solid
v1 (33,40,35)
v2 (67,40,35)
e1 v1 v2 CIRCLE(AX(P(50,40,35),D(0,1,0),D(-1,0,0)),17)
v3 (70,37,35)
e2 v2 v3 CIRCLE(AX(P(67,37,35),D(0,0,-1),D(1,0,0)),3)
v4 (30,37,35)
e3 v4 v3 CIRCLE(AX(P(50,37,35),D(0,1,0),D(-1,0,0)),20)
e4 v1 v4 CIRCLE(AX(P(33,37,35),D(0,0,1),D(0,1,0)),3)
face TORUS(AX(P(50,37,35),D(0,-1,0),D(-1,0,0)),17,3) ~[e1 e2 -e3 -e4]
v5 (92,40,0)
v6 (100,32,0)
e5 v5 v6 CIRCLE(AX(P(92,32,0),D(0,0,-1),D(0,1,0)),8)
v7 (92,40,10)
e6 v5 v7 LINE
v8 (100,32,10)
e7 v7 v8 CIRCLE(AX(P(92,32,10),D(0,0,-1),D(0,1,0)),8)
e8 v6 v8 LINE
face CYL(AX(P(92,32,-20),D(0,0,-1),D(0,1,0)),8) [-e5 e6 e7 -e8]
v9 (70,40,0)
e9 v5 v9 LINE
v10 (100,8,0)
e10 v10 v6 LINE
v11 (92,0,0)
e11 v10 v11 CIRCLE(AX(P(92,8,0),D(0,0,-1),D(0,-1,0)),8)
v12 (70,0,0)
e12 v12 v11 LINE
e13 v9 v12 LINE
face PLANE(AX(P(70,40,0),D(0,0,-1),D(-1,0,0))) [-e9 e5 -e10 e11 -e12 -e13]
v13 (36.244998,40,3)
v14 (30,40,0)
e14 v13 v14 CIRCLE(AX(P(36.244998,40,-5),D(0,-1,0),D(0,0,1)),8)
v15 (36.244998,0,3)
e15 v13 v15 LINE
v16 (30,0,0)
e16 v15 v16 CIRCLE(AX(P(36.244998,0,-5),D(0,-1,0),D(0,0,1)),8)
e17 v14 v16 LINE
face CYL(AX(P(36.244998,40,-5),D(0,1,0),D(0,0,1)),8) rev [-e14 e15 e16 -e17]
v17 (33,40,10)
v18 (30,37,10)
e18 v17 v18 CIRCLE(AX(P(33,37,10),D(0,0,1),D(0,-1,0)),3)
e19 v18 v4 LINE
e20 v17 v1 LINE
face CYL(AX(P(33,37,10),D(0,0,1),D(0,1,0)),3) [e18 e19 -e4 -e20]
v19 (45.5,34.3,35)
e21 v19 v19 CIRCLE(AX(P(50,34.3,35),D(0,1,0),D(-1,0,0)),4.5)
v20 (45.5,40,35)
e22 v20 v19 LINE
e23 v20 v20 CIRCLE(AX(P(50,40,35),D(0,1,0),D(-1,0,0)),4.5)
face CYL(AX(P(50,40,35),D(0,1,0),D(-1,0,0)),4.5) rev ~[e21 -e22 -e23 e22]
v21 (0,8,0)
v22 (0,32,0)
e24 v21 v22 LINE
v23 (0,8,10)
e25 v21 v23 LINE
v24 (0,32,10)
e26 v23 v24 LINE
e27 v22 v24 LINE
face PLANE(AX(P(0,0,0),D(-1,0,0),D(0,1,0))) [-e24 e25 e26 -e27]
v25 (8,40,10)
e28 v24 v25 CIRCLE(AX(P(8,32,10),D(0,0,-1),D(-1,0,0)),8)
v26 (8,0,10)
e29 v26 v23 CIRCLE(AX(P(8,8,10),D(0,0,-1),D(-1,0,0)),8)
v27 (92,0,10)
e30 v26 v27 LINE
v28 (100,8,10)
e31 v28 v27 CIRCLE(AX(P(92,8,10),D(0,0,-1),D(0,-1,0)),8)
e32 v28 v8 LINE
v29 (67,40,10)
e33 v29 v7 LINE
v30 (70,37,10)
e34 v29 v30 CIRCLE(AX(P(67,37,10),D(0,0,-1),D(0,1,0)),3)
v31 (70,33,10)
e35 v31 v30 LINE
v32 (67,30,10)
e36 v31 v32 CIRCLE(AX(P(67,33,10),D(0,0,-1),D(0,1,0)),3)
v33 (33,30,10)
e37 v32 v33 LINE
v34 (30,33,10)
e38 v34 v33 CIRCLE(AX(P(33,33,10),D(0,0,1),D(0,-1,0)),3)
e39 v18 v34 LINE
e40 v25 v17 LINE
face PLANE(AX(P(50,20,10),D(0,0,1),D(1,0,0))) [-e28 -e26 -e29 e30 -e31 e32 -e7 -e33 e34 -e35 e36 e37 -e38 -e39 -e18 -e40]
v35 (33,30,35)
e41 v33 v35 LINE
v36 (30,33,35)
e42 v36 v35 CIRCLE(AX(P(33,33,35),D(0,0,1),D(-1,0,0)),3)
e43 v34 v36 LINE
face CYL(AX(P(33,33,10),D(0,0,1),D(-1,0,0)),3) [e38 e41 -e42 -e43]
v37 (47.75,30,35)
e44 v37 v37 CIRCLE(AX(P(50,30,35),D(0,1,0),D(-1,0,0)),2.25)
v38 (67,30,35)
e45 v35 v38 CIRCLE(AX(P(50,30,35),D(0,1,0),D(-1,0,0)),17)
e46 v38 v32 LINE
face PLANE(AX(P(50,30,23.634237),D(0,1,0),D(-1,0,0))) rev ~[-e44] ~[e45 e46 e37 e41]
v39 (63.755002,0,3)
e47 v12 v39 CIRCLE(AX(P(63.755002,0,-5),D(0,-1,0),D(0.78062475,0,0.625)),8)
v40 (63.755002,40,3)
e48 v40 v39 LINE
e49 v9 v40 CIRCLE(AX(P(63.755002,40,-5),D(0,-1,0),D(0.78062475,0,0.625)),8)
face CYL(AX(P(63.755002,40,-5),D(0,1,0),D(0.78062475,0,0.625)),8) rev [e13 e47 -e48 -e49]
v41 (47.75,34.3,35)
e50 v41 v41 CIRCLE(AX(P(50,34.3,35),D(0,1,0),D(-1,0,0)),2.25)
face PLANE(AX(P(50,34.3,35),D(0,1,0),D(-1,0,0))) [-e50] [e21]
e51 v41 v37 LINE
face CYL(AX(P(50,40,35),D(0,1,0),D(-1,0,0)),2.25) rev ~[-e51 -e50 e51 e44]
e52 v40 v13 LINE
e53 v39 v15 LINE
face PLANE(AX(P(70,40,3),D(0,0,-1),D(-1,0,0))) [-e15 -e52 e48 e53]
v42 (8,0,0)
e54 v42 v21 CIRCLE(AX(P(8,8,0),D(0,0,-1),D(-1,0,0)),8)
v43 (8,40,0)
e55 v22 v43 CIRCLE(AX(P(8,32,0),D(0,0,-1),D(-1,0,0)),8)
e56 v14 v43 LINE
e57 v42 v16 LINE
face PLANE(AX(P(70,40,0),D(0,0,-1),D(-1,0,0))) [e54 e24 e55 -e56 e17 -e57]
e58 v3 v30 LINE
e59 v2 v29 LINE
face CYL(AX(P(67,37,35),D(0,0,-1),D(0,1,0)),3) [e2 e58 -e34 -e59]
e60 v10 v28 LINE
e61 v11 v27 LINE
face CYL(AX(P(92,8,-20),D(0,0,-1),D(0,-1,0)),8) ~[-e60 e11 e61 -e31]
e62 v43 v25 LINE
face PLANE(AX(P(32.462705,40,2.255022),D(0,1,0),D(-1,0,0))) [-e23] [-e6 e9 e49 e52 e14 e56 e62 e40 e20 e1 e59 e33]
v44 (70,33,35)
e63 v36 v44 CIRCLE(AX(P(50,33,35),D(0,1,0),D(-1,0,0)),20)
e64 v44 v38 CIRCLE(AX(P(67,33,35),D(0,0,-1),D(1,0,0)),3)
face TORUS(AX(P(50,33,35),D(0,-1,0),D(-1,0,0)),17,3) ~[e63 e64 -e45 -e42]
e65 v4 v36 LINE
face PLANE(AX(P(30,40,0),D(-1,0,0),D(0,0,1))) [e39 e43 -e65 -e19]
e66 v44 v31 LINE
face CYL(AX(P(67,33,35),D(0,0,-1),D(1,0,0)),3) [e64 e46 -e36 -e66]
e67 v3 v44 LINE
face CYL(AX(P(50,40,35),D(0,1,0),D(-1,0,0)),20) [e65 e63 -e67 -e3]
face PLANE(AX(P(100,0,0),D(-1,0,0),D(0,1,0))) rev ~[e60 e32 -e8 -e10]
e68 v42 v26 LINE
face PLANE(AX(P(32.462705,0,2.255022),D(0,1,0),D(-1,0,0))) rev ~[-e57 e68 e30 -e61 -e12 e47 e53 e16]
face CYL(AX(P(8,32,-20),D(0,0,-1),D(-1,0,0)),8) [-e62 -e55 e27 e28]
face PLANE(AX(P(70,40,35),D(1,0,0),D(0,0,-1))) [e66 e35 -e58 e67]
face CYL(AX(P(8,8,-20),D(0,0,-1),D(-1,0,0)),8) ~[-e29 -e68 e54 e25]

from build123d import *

# Parameters (mm, degrees)
F0_W          = 100
F0_H          = 40
F1_DEPTH      = 10
F4_DEPTH      = 10
F5_W          = 40
F5_H          = 3
F6_DEPTH      = 40.001
F7_R          = 2.25
F8_DEPTH      = 40.001
F9_R          = 4.5
F10_DEPTH     = 5.7
F11_T1_DEPTH  = 40
F11_T3_DEPTH  = 40
F11_T5_DEPTH  = 50
F11_T7_DEPTH  = 50
F11_T9_DEPTH  = 50
F11_T11_DEPTH = 50
F12_R         = 3


# Not quite as in the source:
# - a fillet or chamfer that OpenCascade refuses, or shapes differently, is made with other operations: its cross-section is extruded or revolved along the edge and cut away or added


with BuildPart() as f1:
    # F0 (on Top) → F1 (new body)
    with BuildSketch(Plane.XY):
        with Locations((50, 20)):
            Rectangle(F0_W, F0_H)
    extrude(amount=F1_DEPTH)

    # F3 (on face) → F4 (join)
    with BuildSketch(Plane(origin=(0, 40, 0), x_dir=(-1, 0, 0), z_dir=(0, 1, 0))):
        with BuildLine():
            Line((-70, 35), (-70, 0))
            Line((-70, 0), (-30, 0))
            Line((-30, 0), (-30, 35))
            ThreePointArc((-30, 35), (-50, 55), (-70, 35))
        make_face()
    extrude(amount=-F4_DEPTH)

    # F5 (on face) → F6 (cut, through all)
    with BuildSketch(Plane(origin=(0, 40, 0), x_dir=(-1, 0, 0), z_dir=(0, 1, 0))):
        with Locations((-50, 1.5)):
            Rectangle(F5_W, F5_H)
    extrude(amount=-F6_DEPTH, mode=Mode.SUBTRACT)

    # F7 (on face) → F8 (cut, through all)
    with BuildSketch(Plane(origin=(0, 40, 0), x_dir=(-1, 0, 0), z_dir=(0, 1, 0))):
        with Locations((-50, 35)):
            Circle(F7_R)
    extrude(amount=-F8_DEPTH, mode=Mode.SUBTRACT)

    # F9 (on face) → F10 (cut)
    with BuildSketch(Plane(origin=(0, 40, 0), x_dir=(-1, 0, 0), z_dir=(0, 1, 0))):
        with Locations((-50, 35)):
            Circle(F9_R)
    extrude(amount=-F10_DEPTH, mode=Mode.SUBTRACT)

    # F11: fillet of radius 8 on 6 edges, made by hand

    # F11_s2 → F11_t1 (join)
    with BuildSketch(Plane.XZ.offset(-40)):
        with BuildLine():
            ThreePointArc((70, 0), (67.2191036167, 2.2111025509), (63.7550020016, 3))
            Line((63.7550020016, 3), (70, 3))
            Line((70, 3), (70, 0))
        make_face()
    extrude(amount=F11_T1_DEPTH)

    # F11_s4 → F11_t3 (join)
    with BuildSketch(Plane.XZ.offset(-40)):
        with BuildLine():
            ThreePointArc((36.2449979984, 3), (32.7808963833, 2.2111025509), (30, 0))
            Line((30, 0), (30, 3))
            Line((30, 3), (36.2449979984, 3))
        make_face()
    extrude(amount=F11_T3_DEPTH)

    # F11_s6 → F11_t5 (cut)
    with BuildSketch(Plane.XY.offset(-20)):
        with BuildLine():
            ThreePointArc((0, 32), (2.3431457505, 37.6568542495), (8, 40))
            Line((8, 40), (0, 40))
            Line((0, 40), (0, 32))
        make_face()
    extrude(amount=F11_T5_DEPTH, mode=Mode.SUBTRACT)

    # F11_s8 → F11_t7 (cut)
    with BuildSketch(Plane.XY.offset(-20)):
        with BuildLine():
            ThreePointArc((0, 8), (2.3431457505, 2.3431457505), (8, 0))
            Line((8, 0), (0, 0))
            Line((0, 0), (0, 8))
        make_face()
    extrude(amount=F11_T7_DEPTH, mode=Mode.SUBTRACT)

    # F11_s10 → F11_t9 (cut)
    with BuildSketch(Plane.XY.offset(-20)):
        with BuildLine():
            ThreePointArc((92, 40), (97.6568542495, 37.6568542495), (100, 32))
            Line((100, 32), (100, 40))
            Line((100, 40), (92, 40))
        make_face()
    extrude(amount=F11_T9_DEPTH, mode=Mode.SUBTRACT)

    # F11_s12 → F11_t11 (cut)
    with BuildSketch(Plane.XY.offset(-20)):
        with BuildLine():
            ThreePointArc((92, 0), (97.6568542495, 2.3431457505), (100, 8))
            Line((100, 8), (100, 0))
            Line((100, 0), (92, 0))
        make_face()
    extrude(amount=F11_T11_DEPTH, mode=Mode.SUBTRACT)

    # F12
    f12_edges = [f1.edges().sort_by_distance(p)[0] for p in [
        (50, 40, 55),
        (50, 30, 55),
        (30, 40, 22.5),
        (70, 40, 22.5),
        (30, 30, 22.5),
        (70, 30, 22.5),
    ]]
    fillet(f12_edges, radius=F12_R)


solid = f1.part
